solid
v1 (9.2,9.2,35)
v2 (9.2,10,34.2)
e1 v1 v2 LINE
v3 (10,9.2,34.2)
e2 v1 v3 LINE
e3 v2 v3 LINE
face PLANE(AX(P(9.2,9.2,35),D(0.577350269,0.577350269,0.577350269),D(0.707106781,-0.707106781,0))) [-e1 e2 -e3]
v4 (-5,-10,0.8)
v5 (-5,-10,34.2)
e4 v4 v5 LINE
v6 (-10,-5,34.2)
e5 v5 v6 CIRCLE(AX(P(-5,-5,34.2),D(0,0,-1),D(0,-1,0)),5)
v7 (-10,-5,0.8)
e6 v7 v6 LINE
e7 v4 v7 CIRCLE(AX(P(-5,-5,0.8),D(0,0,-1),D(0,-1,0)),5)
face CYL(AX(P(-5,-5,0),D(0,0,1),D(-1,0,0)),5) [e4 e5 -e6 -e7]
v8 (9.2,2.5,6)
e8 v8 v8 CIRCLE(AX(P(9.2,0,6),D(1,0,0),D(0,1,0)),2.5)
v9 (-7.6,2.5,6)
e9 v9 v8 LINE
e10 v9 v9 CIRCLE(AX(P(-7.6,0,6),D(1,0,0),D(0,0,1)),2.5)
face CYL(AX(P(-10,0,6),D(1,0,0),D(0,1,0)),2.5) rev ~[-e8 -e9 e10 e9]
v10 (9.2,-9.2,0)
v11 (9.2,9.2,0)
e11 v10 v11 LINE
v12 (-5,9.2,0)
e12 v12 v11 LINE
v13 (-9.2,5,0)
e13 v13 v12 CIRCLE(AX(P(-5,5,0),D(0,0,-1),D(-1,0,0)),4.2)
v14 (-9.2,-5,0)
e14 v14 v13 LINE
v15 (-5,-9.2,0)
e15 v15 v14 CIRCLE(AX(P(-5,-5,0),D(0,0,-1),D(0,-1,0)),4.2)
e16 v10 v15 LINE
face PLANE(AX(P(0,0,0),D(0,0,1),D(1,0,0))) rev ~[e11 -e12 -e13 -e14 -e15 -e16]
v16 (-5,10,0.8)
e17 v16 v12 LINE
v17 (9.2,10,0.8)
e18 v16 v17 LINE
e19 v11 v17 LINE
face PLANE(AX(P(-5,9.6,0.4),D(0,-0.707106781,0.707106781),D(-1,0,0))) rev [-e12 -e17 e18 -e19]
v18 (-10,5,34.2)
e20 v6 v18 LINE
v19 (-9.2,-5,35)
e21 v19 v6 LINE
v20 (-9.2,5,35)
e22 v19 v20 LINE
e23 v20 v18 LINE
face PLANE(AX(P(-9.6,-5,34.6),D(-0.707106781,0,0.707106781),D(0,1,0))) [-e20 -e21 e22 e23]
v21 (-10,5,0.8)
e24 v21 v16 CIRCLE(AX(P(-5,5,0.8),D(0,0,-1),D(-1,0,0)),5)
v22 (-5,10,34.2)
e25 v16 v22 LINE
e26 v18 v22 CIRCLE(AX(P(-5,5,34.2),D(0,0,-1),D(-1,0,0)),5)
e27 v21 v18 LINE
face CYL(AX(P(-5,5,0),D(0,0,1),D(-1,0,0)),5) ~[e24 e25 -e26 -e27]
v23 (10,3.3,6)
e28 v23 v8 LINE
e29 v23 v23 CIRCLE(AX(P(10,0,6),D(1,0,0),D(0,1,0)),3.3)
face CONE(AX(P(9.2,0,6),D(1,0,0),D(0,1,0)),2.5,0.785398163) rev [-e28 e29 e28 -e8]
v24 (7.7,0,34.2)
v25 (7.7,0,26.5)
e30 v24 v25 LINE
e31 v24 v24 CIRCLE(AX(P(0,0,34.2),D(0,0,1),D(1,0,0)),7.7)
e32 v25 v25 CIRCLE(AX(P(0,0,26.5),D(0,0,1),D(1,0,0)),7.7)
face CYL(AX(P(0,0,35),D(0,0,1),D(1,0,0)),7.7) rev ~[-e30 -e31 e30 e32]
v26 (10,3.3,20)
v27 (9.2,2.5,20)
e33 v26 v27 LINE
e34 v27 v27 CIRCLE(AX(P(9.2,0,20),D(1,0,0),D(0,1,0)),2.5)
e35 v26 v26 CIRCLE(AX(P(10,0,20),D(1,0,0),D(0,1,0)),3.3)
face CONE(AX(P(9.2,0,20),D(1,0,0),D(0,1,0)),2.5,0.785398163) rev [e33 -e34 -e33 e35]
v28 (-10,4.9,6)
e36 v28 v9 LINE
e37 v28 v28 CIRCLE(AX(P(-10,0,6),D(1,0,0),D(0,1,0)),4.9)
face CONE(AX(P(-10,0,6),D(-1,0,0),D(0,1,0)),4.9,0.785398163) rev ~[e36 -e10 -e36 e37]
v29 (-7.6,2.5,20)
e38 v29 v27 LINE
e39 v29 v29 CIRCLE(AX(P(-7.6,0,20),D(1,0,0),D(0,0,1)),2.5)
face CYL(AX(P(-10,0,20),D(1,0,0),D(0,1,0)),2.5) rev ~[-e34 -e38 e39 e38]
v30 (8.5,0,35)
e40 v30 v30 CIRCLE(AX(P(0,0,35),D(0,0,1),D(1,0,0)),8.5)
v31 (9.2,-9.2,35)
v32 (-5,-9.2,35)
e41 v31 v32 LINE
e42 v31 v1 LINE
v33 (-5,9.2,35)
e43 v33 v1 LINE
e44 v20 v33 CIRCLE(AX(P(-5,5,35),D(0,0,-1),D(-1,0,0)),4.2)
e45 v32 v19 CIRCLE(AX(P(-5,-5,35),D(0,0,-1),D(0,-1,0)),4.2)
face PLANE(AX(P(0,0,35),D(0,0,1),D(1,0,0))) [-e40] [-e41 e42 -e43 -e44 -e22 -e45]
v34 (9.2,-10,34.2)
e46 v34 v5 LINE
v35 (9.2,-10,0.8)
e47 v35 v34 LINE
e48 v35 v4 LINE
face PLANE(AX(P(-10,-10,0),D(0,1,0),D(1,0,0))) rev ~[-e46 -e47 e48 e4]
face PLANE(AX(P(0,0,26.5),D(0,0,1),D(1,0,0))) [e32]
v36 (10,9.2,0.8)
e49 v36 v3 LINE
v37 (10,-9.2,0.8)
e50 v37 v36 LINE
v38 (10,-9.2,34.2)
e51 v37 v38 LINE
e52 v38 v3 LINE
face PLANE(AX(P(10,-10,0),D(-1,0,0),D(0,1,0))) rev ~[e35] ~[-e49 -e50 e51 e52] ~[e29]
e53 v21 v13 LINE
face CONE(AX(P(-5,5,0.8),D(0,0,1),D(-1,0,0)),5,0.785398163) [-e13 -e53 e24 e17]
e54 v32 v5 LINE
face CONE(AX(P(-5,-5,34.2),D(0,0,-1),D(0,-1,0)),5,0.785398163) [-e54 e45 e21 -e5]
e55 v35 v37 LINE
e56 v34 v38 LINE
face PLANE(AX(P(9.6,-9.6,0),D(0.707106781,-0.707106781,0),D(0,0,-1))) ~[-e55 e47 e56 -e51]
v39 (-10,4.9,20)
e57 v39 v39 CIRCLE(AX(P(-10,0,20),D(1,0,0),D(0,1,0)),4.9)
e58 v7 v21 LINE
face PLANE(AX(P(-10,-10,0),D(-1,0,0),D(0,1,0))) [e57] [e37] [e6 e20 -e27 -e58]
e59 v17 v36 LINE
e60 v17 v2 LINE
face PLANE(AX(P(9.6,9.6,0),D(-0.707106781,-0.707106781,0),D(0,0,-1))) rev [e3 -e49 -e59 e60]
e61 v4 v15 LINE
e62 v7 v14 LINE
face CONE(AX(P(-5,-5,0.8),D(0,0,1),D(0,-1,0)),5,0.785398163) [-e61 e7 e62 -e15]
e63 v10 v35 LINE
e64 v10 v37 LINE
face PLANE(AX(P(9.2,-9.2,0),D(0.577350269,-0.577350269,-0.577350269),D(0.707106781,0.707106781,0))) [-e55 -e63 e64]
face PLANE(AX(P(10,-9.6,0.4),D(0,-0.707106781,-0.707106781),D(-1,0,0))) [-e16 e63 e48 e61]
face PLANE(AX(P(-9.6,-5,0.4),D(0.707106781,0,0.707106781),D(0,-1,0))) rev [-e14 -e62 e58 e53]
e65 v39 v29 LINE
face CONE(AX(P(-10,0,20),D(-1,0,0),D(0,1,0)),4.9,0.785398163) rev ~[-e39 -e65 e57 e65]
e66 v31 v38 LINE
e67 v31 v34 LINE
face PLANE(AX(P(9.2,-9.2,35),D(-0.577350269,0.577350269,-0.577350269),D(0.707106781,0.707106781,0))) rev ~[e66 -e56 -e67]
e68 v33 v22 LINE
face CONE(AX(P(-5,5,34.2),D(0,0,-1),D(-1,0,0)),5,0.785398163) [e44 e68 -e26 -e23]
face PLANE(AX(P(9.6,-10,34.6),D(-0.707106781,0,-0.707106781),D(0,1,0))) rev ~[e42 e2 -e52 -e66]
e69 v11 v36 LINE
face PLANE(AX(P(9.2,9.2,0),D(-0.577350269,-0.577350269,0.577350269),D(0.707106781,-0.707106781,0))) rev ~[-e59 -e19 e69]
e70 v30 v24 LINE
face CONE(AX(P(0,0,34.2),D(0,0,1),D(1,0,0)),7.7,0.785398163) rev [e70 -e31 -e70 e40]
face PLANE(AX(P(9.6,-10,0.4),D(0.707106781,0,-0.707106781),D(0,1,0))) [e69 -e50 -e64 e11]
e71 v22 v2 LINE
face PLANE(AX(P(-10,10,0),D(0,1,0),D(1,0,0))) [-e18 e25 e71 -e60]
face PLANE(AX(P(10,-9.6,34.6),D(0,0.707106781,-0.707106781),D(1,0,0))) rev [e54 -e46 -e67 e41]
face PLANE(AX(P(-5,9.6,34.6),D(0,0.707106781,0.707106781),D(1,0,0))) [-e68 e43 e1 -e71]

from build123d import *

# Parameters (mm, degrees)
F0_W           = 20
F0_H           = 20
F1_DEPTH       = 35
F2_R           = 7.7
F3_DEPTH       = 8.5
F5_D           = 5
F5_CSINK_D     = 9.8
F5_CSINK_ANGLE = 90
F6_R           = 5
F7_SIZE        = 0.8


with BuildPart() as f1:
    # F0 (on Top) → F1 (new body)
    with BuildSketch(Plane.XY):
        Rectangle(F0_W, F0_H)
    extrude(amount=F1_DEPTH)

    # F2 (on face) → F3 (cut)
    with BuildSketch(Plane.XY.offset(35)):
        Circle(F2_R)
    extrude(amount=-F3_DEPTH, mode=Mode.SUBTRACT)

    # F5 (through all)
    with Locations(Plane(origin=(-10, 0, 0), x_dir=(0, -1, 0), z_dir=(-1, 0, 0))):
        with Locations((0, 6), (0, 20)):
            CounterSinkHole(F5_D / 2, F5_CSINK_D / 2, counter_sink_angle=F5_CSINK_ANGLE)

    # F6
    f6_edges = [f1.edges().sort_by_distance(p)[0] for p in [
        (-10, -10, 17.5),
        (-10, 10, 17.5),
    ]]
    fillet(f6_edges, radius=F6_R)

    # F7
    f7_edges = [f1.edges().sort_by_distance(p)[0] for p in [
        (-7.7, 0, 35),
        (10, -10, 17.5),
        (10, 10, 17.5),
        (2.5, 10, 35),
        (-10, 0, 35),
        (10, 0, 35),
        (-10, 0, 0),
        (2.5, 10, 0),
        (10, 0, 0),
        (2.5, -10, 0),
        (2.5, -10, 35),
        (-8.535534, -8.535534, 0),
        (-8.535534, 8.535534, 0),
        (-8.535534, -8.535534, 35),
        (10, 2.5, 20),
        (10, 2.5, 6),
        (-8.535534, 8.535534, 35),
    ]]
    chamfer(f7_edges, length=F7_SIZE)


solid = f1.part
